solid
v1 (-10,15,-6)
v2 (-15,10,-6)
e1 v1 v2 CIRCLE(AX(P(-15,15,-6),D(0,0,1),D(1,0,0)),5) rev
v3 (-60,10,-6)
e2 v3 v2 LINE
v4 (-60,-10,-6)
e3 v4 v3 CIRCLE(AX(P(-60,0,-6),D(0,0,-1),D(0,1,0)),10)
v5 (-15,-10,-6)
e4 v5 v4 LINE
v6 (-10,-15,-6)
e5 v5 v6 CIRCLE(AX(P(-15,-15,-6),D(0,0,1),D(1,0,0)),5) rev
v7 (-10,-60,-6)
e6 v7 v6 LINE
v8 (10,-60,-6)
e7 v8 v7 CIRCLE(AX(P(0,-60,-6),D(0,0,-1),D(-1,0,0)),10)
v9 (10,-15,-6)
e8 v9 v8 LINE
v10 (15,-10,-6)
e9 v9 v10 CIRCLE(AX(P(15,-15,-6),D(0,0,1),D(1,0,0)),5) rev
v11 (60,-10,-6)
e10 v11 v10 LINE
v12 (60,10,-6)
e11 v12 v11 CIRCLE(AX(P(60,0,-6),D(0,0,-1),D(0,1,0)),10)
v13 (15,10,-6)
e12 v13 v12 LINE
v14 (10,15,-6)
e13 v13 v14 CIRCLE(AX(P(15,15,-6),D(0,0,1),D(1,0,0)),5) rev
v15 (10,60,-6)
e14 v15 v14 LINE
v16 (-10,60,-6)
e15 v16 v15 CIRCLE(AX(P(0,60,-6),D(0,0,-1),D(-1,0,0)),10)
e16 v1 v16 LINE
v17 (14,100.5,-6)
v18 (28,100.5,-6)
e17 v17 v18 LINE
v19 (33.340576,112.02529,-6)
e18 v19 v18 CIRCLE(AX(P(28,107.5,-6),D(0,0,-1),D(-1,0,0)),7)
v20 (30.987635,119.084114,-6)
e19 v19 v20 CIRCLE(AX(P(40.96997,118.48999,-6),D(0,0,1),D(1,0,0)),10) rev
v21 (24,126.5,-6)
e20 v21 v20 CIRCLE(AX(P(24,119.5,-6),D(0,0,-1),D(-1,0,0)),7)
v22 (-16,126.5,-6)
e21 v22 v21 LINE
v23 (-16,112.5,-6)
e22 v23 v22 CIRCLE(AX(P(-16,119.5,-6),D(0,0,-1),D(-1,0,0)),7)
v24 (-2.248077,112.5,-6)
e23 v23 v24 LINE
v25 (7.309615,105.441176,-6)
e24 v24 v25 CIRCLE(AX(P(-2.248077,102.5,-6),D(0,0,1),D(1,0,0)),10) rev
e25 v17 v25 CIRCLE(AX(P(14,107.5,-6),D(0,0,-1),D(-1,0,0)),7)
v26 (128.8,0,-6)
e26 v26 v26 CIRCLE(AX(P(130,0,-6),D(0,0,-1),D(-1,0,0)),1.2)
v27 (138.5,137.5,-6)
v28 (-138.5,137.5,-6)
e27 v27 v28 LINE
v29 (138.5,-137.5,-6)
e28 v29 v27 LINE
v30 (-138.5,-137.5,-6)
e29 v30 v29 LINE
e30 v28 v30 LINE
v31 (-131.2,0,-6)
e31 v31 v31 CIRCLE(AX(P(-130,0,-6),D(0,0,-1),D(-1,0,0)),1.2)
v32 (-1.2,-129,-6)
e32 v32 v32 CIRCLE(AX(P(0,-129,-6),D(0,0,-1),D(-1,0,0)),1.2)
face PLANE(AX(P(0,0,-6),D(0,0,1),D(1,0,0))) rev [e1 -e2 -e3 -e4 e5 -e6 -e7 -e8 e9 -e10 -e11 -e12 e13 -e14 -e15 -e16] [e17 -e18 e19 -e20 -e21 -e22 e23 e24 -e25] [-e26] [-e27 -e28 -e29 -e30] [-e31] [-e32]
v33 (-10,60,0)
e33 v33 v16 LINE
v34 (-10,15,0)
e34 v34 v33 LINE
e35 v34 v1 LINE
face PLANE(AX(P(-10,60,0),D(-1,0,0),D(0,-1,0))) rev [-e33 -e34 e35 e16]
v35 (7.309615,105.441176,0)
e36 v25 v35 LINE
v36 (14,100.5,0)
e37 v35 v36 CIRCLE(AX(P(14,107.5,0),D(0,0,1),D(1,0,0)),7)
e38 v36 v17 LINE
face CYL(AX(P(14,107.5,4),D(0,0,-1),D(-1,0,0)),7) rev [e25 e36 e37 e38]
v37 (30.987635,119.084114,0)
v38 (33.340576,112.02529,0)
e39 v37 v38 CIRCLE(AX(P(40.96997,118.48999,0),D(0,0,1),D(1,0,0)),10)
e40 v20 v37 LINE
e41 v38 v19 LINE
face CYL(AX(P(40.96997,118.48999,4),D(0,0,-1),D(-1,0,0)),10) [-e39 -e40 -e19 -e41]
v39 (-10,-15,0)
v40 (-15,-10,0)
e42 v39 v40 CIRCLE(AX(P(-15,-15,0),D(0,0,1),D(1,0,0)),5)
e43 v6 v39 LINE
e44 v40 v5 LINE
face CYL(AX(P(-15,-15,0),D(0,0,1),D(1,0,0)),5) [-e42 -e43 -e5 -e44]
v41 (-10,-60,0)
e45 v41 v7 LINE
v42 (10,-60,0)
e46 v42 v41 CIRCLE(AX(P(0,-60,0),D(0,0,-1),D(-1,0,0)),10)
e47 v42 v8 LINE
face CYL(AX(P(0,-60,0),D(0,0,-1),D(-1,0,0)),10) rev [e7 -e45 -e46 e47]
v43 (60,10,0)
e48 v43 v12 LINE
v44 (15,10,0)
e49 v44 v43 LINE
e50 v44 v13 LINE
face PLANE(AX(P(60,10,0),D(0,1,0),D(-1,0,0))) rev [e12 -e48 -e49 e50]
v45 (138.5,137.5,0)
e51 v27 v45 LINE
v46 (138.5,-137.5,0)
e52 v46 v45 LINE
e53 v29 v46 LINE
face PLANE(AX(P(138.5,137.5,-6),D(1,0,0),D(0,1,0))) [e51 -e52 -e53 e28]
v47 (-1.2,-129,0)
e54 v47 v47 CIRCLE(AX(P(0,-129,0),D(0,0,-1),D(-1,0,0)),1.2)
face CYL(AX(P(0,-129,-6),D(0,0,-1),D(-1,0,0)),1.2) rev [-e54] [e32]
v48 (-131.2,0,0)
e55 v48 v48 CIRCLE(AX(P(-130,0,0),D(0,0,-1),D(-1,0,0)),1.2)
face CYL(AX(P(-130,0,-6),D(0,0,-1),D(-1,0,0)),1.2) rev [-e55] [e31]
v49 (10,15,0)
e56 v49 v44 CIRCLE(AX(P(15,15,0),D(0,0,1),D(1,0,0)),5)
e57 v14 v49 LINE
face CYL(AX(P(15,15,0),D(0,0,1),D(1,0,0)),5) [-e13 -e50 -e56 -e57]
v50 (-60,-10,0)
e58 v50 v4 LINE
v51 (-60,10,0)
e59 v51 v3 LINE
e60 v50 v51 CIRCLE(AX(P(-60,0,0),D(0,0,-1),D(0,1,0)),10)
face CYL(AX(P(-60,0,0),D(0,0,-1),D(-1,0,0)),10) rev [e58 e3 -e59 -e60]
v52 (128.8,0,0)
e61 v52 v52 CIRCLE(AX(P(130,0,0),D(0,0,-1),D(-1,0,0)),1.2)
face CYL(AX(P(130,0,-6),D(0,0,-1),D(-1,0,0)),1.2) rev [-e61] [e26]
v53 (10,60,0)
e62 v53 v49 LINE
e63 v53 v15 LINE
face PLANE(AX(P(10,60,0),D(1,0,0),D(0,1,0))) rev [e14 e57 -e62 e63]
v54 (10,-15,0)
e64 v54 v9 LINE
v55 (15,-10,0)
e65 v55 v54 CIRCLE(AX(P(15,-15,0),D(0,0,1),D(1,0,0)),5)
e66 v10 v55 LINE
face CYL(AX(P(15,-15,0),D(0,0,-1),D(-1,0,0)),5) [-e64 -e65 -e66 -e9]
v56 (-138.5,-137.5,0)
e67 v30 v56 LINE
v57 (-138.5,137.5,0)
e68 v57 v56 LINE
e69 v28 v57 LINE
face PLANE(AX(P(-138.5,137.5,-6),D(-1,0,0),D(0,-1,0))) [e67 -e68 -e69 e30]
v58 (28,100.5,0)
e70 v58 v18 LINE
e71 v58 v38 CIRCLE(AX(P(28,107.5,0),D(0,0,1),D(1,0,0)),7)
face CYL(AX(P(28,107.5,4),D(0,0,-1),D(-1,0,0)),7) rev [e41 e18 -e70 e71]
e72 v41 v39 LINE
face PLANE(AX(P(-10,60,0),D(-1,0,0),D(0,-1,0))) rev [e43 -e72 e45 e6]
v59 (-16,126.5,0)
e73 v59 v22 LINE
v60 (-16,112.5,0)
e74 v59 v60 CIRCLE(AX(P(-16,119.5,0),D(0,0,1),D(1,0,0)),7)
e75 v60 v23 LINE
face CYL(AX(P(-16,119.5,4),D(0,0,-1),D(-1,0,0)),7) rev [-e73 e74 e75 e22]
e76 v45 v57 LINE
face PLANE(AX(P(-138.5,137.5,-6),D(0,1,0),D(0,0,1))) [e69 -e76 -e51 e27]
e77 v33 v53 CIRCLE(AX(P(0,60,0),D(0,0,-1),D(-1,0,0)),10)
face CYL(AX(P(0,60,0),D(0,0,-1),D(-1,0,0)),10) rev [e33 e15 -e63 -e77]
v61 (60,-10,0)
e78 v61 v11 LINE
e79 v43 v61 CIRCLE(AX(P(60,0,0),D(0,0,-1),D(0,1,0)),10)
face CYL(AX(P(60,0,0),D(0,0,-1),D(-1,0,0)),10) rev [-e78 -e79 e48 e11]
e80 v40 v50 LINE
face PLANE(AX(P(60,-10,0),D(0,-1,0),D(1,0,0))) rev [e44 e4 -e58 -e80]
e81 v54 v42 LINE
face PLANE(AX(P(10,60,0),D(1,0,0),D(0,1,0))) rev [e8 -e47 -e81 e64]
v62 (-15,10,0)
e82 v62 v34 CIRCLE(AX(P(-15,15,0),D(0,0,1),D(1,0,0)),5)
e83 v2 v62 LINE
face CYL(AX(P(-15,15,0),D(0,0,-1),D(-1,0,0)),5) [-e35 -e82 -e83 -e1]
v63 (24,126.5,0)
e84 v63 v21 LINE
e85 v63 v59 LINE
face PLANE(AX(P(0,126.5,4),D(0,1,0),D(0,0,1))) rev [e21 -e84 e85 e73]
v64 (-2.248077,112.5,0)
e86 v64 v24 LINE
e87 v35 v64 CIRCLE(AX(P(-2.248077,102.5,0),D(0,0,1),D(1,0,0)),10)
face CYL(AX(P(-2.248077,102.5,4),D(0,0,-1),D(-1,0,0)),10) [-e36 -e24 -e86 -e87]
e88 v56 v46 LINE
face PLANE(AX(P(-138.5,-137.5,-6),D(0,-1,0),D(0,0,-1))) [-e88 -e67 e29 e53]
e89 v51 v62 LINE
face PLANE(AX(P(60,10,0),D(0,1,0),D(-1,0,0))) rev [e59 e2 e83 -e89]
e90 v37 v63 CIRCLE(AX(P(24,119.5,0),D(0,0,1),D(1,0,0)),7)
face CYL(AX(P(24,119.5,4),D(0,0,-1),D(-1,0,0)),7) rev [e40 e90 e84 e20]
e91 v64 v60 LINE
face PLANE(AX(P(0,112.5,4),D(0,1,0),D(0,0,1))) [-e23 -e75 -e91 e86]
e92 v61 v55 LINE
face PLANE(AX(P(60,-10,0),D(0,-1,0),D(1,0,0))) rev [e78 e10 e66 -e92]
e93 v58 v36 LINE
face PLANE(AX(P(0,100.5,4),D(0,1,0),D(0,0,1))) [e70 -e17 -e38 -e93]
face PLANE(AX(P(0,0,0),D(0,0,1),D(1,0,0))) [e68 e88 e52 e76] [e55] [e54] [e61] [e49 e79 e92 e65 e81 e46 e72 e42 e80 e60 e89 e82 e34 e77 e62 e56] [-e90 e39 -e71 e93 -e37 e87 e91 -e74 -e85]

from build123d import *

# Parameters (mm, degrees)
CROQUIS1_W                   = 277
CROQUIS1_H                   = 275
BRIDA_BASE1_DEPTH            = 6
CORTAR_EXTRUIR4_DEPTH        = 10
REDONDEO2_R                  = 10
TALADRO_DE_MARGEN_PARA_M21_D = 2.4
CORTAR_EXTRUIR5_DEPTH        = 196.254961669
MATRIZC1_COUNT               = 4
REDONDEO3_R                  = 5


# Sheet-metal steps are written as plain solids
with BuildPart() as part:
    # Croquis1 → Brida base1 (new body)
    with BuildSketch(Plane.XY):
        Rectangle(CROQUIS1_W, CROQUIS1_H)
    extrude(amount=-BRIDA_BASE1_DEPTH)

    # Croquis6 → Cortar-Extruir4 (cut)
    with BuildSketch(Plane(origin=(0, 0, -6), x_dir=(-1, 0, 0), z_dir=(0, 0, -1))):
        with BuildLine():
            Line((-9.101020514, 112.5), (16, 112.5))
            ThreePointArc((16, 112.5), (23, 119.5), (16, 126.5))
            Line((16, 126.5), (-24, 126.5))
            ThreePointArc((-24, 126.5), (-30.494583009, 122.111587935), (-28.846049894, 114.448683298))
            ThreePointArc((-28.846049894, 114.448683298), (-28.423802379, 114.487159047), (-28, 114.5))
            Line((-28, 114.5), (-14, 114.5))
            ThreePointArc((-14, 114.5), (-11.354248689, 113.980740698), (-9.101020514, 112.5))
        make_face()
        with BuildLine():
            ThreePointArc((-14, 100.5), (-7.519259302, 104.854248689), (-9.101020514, 112.5))
            Line((-9.101020514, 112.5), (-24, 112.5))
            ThreePointArc((-24, 112.5), (-26.611587935, 113.005416991), (-28.846049894, 114.448683298))
            ThreePointArc((-28.846049894, 114.448683298), (-34.987159047, 107.076197621), (-28, 100.5))
            Line((-28, 100.5), (-14, 100.5))
        make_face()
        with BuildLine():
            Line((-24, 112.5), (-9.101020514, 112.5))
            ThreePointArc((-9.101020514, 112.5), (-11.354248689, 113.980740698), (-14, 114.5))
            Line((-14, 114.5), (-28, 114.5))
            ThreePointArc((-28, 114.5), (-28.423802379, 114.487159047), (-28.846049894, 114.448683298))
            ThreePointArc((-28.846049894, 114.448683298), (-26.611587935, 113.005416991), (-24, 112.5))
        make_face()
    extrude(amount=-CORTAR_EXTRUIR4_DEPTH, mode=Mode.SUBTRACT)

    # Redondeo2
    redondeo2_edges = [part.edges().sort_by_distance(p)[0] for p in [
        (28.846049894, 114.448683298, -3),
        (9.101020514, 112.5, -3),
    ]]
    fillet(redondeo2_edges, radius=REDONDEO2_R)

    # Taladro de margen para M21 (through all)
    with Locations(Plane(origin=(0, 0, -6), x_dir=(-1, 0, 0), z_dir=(0, 0, -1))):
        with Locations((-130, 0), (130, 0), (0, -129)):
            Hole(TALADRO_DE_MARGEN_PARA_M21_D / 2)

    # Croquis16 → Cortar-Extruir5 (cut, through all)
    with BuildSketch(Plane(origin=(0, 0, -6), x_dir=(-1, 0, 0), z_dir=(0, 0, -1))):
        with BuildLine():
            Line((10, 60), (10, -60))
            ThreePointArc((10, -60), (0, -70), (-10, -60))
            Line((-10, -60), (-10, 60))
            ThreePointArc((-10, 60), (0, 70), (10, 60))
        make_face()
    cortar_extruir5 = extrude(amount=-CORTAR_EXTRUIR5_DEPTH, mode=Mode.SUBTRACT)

    # MatrizC1: Cortar-Extruir5 ×4 about axis
    matrizc1_axis = Axis((0, 0, 0), (0, 0, 1))
    for i in range(1, MATRIZC1_COUNT):
        add(cortar_extruir5.rotate(matrizc1_axis, i * 360 / MATRIZC1_COUNT), mode=Mode.SUBTRACT)

    # Redondeo3
    redondeo3_edges = [part.edges().sort_by_distance(p)[0] for p in [
        (10, 10, -3),
        (10, -10, -3),
        (-10, 10, -3),
        (-10, -10, -3),
    ]]
    fillet(redondeo3_edges, radius=REDONDEO3_R)


solid = part.part
